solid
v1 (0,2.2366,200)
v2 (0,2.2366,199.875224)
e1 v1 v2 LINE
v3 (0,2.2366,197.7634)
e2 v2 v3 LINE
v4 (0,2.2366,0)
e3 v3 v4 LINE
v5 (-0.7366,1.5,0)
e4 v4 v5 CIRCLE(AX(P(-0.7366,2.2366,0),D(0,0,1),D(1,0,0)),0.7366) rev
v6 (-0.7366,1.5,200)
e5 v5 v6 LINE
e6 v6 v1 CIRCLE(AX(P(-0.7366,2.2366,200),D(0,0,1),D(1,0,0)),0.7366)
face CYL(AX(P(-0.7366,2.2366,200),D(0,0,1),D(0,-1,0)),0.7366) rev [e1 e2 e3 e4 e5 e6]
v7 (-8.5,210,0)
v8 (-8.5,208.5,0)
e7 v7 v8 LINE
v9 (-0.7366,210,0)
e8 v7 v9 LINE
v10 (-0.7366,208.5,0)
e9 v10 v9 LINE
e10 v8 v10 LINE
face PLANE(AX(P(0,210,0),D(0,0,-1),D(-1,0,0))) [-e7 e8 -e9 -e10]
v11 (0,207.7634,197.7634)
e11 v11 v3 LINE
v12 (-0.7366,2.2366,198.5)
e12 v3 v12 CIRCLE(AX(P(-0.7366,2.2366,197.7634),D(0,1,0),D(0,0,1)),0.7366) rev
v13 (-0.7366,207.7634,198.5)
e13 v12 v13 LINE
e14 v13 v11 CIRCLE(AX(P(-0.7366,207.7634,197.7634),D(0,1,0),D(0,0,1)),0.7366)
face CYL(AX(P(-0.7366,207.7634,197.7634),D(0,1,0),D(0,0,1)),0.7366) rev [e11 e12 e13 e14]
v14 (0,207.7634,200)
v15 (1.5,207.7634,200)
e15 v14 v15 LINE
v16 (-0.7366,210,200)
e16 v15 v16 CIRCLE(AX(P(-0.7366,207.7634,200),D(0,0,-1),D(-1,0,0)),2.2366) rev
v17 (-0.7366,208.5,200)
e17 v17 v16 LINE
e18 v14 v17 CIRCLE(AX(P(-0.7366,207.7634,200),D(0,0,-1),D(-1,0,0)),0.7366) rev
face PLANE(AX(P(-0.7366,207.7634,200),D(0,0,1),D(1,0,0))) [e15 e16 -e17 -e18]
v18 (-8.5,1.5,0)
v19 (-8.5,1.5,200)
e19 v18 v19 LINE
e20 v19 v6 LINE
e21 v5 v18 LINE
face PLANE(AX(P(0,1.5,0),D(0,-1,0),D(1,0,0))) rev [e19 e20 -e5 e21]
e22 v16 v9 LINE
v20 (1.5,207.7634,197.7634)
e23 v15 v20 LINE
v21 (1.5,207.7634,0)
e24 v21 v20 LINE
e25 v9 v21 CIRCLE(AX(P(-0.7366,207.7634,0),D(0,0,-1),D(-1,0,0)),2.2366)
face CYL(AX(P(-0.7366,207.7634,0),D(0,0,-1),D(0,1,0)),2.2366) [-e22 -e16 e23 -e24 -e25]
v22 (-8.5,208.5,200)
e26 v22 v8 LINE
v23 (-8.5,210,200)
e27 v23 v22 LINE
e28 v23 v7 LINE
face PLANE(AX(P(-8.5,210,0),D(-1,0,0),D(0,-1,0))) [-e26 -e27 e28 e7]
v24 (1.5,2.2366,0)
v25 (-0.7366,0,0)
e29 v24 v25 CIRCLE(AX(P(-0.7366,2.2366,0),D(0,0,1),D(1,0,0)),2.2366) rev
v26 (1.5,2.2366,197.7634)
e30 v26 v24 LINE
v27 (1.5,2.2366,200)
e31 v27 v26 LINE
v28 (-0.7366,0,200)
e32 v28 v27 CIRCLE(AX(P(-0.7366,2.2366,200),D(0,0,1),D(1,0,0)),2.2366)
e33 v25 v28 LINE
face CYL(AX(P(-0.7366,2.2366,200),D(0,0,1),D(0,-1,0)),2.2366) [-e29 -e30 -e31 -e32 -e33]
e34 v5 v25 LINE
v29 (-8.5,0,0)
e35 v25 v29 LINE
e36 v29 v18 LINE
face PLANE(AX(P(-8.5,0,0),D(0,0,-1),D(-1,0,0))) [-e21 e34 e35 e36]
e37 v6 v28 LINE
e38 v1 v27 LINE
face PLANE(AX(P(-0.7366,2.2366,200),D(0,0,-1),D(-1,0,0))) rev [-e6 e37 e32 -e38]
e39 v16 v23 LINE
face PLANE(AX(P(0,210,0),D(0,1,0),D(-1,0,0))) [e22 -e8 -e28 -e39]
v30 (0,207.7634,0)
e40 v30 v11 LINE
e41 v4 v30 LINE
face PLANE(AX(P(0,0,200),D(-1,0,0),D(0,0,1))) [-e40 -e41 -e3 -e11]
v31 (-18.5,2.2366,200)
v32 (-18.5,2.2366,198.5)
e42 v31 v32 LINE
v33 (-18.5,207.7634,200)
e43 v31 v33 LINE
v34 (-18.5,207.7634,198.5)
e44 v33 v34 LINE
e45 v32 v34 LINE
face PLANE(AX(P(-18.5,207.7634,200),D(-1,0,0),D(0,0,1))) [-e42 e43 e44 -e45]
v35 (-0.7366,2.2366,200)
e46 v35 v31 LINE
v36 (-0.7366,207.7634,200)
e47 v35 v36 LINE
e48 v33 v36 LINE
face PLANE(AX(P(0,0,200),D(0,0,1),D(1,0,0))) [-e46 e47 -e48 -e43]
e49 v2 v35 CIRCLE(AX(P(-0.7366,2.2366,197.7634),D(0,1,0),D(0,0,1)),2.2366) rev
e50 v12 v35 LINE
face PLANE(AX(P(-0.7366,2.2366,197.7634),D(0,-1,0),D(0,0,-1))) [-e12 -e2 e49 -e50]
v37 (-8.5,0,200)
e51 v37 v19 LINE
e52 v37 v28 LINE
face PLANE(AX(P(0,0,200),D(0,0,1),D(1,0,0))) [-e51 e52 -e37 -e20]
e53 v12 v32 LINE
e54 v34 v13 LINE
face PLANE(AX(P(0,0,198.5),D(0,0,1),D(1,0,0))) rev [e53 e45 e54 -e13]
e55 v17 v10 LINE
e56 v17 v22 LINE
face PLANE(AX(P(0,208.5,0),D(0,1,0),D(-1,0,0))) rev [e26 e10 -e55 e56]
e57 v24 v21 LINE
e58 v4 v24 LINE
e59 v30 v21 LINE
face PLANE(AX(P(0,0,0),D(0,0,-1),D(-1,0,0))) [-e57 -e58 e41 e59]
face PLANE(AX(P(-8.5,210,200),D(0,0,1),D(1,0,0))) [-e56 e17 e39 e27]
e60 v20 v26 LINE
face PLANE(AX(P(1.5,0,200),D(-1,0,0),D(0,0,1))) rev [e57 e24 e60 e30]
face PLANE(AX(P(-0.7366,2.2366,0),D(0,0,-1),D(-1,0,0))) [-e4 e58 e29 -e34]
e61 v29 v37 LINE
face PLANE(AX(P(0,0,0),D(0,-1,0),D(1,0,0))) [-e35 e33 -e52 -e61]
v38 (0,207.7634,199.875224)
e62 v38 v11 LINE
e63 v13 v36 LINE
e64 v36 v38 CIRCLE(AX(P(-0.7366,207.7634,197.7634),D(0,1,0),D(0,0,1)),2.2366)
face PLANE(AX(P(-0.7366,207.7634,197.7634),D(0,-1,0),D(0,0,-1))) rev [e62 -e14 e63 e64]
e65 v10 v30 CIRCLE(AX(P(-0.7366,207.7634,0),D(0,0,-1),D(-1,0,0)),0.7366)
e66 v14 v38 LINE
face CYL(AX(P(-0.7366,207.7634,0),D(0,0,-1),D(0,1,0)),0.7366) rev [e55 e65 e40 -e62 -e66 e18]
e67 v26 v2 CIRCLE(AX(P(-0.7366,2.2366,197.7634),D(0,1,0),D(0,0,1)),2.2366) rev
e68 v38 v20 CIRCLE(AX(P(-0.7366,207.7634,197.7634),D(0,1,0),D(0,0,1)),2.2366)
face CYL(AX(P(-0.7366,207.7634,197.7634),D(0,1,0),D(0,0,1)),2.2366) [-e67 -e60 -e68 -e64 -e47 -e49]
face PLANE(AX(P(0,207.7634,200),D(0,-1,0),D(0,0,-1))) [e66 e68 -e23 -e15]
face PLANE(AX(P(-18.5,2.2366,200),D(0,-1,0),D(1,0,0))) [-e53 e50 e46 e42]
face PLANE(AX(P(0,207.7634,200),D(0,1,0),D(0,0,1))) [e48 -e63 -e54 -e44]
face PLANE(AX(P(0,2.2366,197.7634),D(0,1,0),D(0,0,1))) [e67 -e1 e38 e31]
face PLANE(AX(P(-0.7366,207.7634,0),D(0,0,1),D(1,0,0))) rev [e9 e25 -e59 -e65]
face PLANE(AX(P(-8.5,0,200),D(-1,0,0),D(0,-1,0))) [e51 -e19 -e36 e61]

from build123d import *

# Parameters (mm, degrees)
SKETCH_2_W                       = 1.5
SKETCH_2_H                       = 210
SM_BASE_FLANGE_1_DEPTH           = 200
SM_EDGE_FLANGE_1_STRIP_W         = 7.4732
SM_EDGE_FLANGE_1_STRIP_H         = 1.5
SM_EDGE_FLANGE_1_STRIP_CUT_DEPTH = 200
SM_EDGE_FLANGE_1_DEPTH           = 200
SM_EDGE_FLANGE_2_STRIP_W         = 7.4732
SM_EDGE_FLANGE_2_STRIP_H         = 1.5
SM_EDGE_FLANGE_2_STRIP_CUT_DEPTH = 200
SM_EDGE_FLANGE_2_DEPTH           = 200
SM_EDGE_FLANGE_3_STRIP_W         = 7.4732
SM_EDGE_FLANGE_3_STRIP_H         = 1.5
SM_EDGE_FLANGE_3_STRIP_CUT_DEPTH = 205.5268
SM_EDGE_FLANGE_3_DEPTH           = 205.5268


# Sheet-metal steps are written as plain solids
with BuildPart() as part:
    # Sketch 2 → 基体-法兰1 (new body)
    with BuildSketch(Plane.XY):
        with Locations((0.75, 105)):
            Rectangle(SKETCH_2_W, SKETCH_2_H)
    extrude(amount=SM_BASE_FLANGE_1_DEPTH)

    # 边线-法兰1 strip (across the edge) → 边线-法兰1 strip cut (cut)
    with BuildSketch(Plane(origin=(0, 210, 200), x_dir=(0, -1, 0), z_dir=(0, 0, -1))):
        with Locations((-1.5, -0.75)):
            Rectangle(SM_EDGE_FLANGE_1_STRIP_W, SM_EDGE_FLANGE_1_STRIP_H)
    extrude(amount=SM_EDGE_FLANGE_1_STRIP_CUT_DEPTH, mode=Mode.SUBTRACT)

    # 边线-法兰1 section (across the edge) → 边线-法兰1 (add)
    with BuildSketch(Plane(origin=(0, 210, 200), x_dir=(0, -1, 0), z_dir=(0, 0, -1))):
        with BuildLine():
            Line((0, 0.7366), (0, 8.5))
            Line((0, 8.5), (1.5, 8.5))
            Line((1.5, 8.5), (1.5, 0.7366))
            ThreePointArc((1.5, 0.7366), (1.715745145, 0.215745145), (2.2366, 0))
            Line((2.2366, 0), (2.2366, -1.5))
            ThreePointArc((2.2366, -1.5), (0.655084973, -0.844915027), (0, 0.7366))
        make_face()
    extrude(amount=SM_EDGE_FLANGE_1_DEPTH)

    # 边线-法兰2 strip (across the edge) → 边线-法兰2 strip cut (cut)
    with BuildSketch(Plane(origin=(0, 0, 0), x_dir=(0, 1, 0), z_dir=(0, 0, 1))):
        with Locations((-1.5, -0.75)):
            Rectangle(SM_EDGE_FLANGE_2_STRIP_W, SM_EDGE_FLANGE_2_STRIP_H)
    extrude(amount=SM_EDGE_FLANGE_2_STRIP_CUT_DEPTH, mode=Mode.SUBTRACT)

    # 边线-法兰2 section (across the edge) → 边线-法兰2 (add)
    with BuildSketch(Plane(origin=(0, 0, 0), x_dir=(0, 1, 0), z_dir=(0, 0, 1))):
        with BuildLine():
            Line((0, 0.7366), (0, 8.5))
            Line((0, 8.5), (1.5, 8.5))
            Line((1.5, 8.5), (1.5, 0.7366))
            ThreePointArc((1.5, 0.7366), (1.715745145, 0.215745145), (2.2366, 0))
            Line((2.2366, 0), (2.2366, -1.5))
            ThreePointArc((2.2366, -1.5), (0.655084973, -0.844915027), (0, 0.7366))
        make_face()
    extrude(amount=SM_EDGE_FLANGE_2_DEPTH)

    # 边线-法兰3 strip (across the edge) → 边线-法兰3 strip cut (cut)
    with BuildSketch(Plane(origin=(0, 2.2366, 200), x_dir=(0, 0, -1), z_dir=(0, 1, 0))):
        with Locations((-1.5, -0.75)):
            Rectangle(SM_EDGE_FLANGE_3_STRIP_W, SM_EDGE_FLANGE_3_STRIP_H)
    extrude(amount=SM_EDGE_FLANGE_3_STRIP_CUT_DEPTH, mode=Mode.SUBTRACT)

    # 边线-法兰3 section (across the edge) → 边线-法兰3 (add)
    with BuildSketch(Plane(origin=(0, 2.2366, 200), x_dir=(0, 0, -1), z_dir=(0, 1, 0))):
        with BuildLine():
            Line((0, 0.7366), (0, 18.5))
            Line((0, 18.5), (1.5, 18.5))
            Line((1.5, 18.5), (1.5, 0.7366))
            ThreePointArc((1.5, 0.7366), (1.715745145, 0.215745145), (2.2366, 0))
            Line((2.2366, 0), (2.2366, -1.5))
            ThreePointArc((2.2366, -1.5), (0.655084973, -0.844915027), (0, 0.7366))
        make_face()
    extrude(amount=SM_EDGE_FLANGE_3_DEPTH)


solid = part.part
